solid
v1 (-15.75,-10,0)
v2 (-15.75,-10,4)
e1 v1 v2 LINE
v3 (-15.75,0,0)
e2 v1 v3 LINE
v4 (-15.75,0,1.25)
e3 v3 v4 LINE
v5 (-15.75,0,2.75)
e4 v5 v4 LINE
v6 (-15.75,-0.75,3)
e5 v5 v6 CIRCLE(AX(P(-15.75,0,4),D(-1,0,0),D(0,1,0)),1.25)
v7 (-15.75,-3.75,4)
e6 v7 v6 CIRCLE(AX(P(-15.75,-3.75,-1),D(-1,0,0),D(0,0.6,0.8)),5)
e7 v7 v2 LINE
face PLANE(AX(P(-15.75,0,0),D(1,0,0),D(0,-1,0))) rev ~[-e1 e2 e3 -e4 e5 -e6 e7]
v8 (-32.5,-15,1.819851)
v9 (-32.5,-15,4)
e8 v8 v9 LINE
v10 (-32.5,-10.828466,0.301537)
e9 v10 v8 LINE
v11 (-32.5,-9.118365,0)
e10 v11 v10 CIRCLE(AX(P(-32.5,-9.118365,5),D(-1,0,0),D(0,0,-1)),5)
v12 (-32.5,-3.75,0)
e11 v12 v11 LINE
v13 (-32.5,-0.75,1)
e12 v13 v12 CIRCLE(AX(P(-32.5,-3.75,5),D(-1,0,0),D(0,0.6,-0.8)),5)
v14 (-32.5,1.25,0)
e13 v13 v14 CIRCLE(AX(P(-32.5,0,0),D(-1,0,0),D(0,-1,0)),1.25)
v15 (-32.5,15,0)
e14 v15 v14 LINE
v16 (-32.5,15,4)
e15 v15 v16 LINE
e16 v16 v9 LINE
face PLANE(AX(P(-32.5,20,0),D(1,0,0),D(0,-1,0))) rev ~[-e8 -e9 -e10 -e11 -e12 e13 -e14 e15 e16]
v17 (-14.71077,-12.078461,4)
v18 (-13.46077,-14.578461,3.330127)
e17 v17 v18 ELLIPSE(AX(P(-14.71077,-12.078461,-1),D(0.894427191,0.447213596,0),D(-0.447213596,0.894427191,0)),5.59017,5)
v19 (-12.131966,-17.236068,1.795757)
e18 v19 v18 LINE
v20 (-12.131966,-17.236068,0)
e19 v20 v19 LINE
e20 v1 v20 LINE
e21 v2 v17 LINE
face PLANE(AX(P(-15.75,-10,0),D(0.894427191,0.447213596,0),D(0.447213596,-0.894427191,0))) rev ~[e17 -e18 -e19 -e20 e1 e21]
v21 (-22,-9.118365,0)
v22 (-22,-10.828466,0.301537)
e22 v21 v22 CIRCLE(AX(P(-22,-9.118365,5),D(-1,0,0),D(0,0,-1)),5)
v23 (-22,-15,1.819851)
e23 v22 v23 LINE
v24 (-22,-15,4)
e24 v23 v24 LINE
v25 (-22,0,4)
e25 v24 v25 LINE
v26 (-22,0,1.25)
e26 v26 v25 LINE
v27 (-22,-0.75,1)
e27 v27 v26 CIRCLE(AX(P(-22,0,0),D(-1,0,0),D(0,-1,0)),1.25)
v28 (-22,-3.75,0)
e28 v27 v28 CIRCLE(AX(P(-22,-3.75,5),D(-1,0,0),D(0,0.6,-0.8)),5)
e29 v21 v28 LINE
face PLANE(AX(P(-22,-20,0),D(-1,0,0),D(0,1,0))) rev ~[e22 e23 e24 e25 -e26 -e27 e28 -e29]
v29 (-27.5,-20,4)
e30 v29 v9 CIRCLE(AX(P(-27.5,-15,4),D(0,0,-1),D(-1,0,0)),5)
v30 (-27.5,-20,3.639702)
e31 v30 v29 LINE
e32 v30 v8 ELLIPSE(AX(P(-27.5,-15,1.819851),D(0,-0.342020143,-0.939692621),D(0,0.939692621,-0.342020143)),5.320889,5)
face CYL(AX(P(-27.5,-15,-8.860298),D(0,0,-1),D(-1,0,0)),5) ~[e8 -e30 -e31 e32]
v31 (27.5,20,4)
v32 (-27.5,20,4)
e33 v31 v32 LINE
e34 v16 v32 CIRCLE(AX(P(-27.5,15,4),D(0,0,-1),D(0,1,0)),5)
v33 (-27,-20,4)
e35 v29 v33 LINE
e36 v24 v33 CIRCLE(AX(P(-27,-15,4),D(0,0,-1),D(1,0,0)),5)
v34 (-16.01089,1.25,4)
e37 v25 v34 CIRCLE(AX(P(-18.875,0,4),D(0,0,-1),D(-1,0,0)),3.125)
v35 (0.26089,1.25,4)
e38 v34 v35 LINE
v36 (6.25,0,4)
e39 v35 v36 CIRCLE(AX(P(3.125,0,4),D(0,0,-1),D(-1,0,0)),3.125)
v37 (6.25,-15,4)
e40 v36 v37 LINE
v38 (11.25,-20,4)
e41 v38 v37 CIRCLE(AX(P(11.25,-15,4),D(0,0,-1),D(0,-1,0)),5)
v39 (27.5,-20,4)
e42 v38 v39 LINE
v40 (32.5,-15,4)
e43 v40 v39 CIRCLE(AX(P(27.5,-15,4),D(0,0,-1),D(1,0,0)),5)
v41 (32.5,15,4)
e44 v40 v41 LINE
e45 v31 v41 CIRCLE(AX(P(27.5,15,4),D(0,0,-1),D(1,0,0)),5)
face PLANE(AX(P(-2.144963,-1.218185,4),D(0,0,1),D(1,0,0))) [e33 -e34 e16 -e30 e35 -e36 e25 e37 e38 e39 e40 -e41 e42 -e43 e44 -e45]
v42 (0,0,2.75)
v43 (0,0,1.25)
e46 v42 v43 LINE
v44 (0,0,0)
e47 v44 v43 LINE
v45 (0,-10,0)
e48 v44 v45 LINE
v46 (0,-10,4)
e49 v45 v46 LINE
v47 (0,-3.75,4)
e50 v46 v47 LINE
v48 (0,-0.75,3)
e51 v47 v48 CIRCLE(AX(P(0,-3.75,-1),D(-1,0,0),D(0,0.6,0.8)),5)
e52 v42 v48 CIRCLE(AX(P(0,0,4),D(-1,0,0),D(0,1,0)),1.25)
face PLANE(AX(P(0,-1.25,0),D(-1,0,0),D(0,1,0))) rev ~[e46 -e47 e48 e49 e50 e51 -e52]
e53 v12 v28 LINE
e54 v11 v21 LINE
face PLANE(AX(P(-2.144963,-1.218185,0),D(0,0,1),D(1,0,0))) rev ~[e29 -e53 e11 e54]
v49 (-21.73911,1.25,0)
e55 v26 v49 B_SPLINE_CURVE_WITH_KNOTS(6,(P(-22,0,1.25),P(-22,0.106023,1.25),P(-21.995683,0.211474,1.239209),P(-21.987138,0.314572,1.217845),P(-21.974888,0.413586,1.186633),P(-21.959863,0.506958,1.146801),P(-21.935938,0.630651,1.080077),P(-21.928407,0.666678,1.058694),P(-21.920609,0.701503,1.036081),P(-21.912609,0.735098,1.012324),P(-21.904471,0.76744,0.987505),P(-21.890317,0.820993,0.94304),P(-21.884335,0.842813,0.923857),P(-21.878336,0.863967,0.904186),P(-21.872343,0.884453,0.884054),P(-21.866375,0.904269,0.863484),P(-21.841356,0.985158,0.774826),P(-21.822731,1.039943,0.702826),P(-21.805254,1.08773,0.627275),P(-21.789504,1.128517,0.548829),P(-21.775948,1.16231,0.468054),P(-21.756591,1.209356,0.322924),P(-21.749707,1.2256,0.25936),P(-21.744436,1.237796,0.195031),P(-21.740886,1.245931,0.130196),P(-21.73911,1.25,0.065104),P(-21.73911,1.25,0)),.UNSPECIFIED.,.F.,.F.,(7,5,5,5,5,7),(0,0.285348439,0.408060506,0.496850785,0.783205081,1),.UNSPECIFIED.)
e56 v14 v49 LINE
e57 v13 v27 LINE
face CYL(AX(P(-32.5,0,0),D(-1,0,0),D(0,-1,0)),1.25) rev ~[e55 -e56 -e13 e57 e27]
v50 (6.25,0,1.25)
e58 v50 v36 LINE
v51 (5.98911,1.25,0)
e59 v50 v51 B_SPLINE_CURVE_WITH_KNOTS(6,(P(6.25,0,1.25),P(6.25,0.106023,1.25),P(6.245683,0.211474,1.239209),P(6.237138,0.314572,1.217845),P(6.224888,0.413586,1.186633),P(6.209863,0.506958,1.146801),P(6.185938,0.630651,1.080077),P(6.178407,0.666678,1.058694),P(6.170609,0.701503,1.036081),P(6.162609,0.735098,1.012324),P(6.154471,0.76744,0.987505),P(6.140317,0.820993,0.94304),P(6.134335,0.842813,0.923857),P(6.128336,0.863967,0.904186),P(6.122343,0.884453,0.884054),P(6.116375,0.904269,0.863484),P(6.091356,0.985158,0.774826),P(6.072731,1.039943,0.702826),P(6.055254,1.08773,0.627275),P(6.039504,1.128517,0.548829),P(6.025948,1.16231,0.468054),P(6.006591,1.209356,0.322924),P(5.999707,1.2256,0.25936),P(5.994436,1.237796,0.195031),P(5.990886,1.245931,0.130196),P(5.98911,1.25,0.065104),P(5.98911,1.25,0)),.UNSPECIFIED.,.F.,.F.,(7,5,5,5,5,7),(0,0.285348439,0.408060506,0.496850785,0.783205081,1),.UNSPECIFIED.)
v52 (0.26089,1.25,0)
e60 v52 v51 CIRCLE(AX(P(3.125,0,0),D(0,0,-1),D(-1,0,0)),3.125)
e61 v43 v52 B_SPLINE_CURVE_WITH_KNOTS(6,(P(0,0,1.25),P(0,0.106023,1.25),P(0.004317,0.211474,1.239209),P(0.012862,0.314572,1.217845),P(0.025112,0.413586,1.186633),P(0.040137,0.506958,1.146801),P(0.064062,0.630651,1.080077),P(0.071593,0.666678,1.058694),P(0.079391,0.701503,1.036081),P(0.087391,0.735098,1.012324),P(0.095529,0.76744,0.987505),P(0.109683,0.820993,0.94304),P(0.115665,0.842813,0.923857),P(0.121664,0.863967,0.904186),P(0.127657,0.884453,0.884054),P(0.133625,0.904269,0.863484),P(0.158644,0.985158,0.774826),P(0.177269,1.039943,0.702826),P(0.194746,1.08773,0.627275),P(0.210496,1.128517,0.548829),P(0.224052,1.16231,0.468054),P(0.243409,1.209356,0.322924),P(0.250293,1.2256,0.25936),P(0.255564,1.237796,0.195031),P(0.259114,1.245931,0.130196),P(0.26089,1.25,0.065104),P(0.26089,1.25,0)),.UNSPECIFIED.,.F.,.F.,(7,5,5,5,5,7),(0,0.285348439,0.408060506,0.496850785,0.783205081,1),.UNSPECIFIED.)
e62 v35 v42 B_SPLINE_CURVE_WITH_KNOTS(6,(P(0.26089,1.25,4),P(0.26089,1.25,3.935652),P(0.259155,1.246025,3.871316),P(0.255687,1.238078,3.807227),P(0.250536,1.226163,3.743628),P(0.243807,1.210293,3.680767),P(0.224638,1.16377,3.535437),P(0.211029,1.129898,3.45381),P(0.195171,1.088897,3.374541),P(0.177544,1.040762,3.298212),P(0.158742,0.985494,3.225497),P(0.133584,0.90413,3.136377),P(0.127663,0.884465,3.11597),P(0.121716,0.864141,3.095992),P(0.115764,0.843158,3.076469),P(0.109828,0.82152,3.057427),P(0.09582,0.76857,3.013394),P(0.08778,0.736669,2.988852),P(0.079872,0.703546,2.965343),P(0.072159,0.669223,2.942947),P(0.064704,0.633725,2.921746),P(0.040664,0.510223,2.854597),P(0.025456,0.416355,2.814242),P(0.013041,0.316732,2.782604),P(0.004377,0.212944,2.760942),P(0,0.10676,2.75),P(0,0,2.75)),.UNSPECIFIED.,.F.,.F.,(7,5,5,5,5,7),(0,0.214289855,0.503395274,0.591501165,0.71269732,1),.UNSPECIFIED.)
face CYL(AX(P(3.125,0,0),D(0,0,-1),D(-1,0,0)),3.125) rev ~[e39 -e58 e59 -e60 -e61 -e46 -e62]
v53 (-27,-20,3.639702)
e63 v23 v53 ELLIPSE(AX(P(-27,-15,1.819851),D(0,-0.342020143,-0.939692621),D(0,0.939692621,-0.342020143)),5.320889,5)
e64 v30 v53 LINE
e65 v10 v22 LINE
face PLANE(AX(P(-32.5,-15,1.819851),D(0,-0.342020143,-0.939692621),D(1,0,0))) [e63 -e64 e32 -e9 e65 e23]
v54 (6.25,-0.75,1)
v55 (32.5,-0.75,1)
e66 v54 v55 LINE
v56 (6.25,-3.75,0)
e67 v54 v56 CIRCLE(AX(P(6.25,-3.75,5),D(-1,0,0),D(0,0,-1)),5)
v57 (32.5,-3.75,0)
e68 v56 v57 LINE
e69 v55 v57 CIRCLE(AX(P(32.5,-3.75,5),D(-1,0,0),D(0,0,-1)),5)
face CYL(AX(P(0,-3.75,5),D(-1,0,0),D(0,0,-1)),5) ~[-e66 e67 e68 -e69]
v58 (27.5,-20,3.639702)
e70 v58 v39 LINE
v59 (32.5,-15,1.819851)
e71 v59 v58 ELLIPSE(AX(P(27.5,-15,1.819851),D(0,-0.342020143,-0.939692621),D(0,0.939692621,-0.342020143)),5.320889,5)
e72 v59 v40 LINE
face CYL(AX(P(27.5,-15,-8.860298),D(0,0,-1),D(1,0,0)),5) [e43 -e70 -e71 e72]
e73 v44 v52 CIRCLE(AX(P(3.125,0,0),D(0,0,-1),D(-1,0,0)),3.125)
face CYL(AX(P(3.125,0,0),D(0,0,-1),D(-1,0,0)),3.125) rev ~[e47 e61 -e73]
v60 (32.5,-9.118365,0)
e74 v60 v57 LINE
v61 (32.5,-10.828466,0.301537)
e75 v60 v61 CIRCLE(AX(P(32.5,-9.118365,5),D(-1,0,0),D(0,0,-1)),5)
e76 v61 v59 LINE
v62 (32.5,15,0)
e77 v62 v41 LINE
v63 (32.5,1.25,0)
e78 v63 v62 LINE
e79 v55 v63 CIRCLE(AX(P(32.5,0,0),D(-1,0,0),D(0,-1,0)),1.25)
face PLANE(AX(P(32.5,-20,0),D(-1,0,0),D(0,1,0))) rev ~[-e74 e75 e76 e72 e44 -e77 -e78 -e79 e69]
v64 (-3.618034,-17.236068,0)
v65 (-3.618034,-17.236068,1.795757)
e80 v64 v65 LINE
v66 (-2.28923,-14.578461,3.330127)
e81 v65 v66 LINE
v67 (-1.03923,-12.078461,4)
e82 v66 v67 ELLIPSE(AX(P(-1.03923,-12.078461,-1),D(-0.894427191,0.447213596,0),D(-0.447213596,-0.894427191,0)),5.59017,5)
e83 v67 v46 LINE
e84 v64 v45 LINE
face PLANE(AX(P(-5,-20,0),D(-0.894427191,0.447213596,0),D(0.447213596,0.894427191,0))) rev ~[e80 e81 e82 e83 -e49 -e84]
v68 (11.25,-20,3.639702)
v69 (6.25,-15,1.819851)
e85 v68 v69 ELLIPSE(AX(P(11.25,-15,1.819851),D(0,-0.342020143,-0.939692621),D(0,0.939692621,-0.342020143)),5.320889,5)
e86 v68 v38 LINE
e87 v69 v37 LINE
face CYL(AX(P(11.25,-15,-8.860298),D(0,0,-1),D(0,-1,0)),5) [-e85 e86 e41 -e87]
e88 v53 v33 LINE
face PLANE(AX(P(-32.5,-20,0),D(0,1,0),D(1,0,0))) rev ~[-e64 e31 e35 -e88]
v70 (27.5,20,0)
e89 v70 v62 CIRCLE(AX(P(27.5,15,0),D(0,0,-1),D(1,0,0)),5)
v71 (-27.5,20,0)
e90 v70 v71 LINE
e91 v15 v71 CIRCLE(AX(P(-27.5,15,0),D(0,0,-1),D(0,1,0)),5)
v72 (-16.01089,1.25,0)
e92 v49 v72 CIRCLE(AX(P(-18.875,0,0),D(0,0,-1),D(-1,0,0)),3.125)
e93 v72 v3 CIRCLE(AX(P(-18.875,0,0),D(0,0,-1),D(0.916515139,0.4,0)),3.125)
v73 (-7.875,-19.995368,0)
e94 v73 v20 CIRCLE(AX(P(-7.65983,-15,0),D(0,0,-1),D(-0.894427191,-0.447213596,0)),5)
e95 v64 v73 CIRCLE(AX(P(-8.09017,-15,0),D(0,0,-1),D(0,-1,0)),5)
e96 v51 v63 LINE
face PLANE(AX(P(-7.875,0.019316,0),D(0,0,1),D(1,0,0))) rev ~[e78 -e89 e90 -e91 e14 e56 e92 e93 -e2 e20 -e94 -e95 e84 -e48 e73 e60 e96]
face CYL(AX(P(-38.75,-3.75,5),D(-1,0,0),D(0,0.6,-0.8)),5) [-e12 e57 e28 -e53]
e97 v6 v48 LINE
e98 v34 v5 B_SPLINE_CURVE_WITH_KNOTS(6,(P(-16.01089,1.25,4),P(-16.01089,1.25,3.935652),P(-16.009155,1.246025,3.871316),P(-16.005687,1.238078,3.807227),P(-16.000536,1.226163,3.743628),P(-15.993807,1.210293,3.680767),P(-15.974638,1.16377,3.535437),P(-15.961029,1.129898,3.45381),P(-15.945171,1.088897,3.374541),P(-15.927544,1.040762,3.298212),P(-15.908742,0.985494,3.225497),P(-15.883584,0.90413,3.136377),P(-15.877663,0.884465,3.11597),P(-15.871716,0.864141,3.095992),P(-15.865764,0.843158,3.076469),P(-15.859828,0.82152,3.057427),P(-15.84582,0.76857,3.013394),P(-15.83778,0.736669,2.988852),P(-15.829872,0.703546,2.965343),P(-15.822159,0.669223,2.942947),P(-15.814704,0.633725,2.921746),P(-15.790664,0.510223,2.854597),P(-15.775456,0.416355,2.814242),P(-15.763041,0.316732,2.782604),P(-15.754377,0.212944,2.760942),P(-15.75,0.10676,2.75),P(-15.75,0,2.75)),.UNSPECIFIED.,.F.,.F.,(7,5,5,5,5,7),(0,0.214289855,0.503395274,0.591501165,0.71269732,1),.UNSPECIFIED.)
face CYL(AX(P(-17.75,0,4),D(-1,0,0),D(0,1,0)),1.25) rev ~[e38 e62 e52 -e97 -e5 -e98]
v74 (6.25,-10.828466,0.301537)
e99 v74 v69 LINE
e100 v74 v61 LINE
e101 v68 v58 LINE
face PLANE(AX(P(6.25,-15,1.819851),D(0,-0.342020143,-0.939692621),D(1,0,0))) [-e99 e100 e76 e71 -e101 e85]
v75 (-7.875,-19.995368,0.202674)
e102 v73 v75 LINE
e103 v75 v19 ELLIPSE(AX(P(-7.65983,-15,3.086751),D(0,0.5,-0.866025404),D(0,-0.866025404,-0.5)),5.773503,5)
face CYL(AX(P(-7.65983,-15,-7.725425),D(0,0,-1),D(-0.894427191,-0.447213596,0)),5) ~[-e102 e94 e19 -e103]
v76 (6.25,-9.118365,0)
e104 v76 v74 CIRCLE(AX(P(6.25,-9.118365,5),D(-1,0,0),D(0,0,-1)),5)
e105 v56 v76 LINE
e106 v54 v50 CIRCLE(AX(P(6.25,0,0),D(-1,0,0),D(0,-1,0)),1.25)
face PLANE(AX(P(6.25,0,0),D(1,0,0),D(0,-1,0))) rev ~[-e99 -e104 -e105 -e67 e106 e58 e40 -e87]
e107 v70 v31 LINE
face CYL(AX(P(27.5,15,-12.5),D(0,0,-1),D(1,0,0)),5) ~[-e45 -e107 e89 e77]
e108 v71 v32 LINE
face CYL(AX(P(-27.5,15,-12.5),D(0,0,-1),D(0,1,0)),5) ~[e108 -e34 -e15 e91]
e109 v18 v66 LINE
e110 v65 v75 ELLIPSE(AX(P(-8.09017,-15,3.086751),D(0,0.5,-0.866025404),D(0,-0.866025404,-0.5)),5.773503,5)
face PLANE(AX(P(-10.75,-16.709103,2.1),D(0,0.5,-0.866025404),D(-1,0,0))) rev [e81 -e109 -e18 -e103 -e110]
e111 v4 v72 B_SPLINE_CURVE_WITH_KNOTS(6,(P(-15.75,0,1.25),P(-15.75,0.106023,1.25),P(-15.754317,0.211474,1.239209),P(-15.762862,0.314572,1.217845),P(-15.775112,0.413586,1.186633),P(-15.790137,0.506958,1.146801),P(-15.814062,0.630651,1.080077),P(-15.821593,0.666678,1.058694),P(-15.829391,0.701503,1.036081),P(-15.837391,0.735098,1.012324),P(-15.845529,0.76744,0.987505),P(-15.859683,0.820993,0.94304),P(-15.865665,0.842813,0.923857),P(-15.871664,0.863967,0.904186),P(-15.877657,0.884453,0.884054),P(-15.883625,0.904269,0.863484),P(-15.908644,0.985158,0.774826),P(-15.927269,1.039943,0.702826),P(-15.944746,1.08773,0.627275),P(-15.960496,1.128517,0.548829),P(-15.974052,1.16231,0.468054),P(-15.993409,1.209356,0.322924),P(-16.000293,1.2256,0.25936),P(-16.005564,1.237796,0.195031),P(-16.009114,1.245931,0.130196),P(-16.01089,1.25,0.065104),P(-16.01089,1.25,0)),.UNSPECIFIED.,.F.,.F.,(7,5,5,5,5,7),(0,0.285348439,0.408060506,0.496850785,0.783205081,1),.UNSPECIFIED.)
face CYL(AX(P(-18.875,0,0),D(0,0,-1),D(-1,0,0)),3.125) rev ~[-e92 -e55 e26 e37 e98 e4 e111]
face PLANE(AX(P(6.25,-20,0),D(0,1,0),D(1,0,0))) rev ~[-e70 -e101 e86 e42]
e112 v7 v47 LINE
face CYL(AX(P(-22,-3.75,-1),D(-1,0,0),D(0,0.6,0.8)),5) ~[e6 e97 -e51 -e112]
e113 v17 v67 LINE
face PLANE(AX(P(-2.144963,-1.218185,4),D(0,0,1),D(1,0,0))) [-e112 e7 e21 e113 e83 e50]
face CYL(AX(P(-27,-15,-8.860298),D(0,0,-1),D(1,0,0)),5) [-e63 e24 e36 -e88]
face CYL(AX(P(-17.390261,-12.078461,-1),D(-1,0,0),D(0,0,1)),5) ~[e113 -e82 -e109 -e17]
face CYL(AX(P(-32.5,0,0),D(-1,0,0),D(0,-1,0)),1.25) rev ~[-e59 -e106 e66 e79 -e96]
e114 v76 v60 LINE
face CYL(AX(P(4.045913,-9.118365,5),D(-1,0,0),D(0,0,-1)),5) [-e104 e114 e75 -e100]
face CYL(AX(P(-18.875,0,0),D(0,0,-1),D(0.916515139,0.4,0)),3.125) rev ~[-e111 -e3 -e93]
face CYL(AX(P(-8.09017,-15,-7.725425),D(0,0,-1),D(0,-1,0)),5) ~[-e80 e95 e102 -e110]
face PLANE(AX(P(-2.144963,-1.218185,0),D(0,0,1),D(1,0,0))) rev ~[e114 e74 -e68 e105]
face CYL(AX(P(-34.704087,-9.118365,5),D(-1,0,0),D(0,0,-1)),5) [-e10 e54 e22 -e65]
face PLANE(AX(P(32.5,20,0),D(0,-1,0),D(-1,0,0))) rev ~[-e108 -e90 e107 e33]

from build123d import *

# Parameters (mm, degrees)
F1_DEPTH      = 4
F3_DEPTH      = 65.001
F5_DEPTH      = 2
F8_DEPTH      = 20
F9_SIZE2      = 6.5817930688
F9_SIZE       = 3.8
F10_SIZE2     = 3.6397023427
F10_SIZE      = 10
F10_2_SIZE2   = 3.6397023427
F10_2_SIZE    = 10
F11_T1_DEPTH  = 19.0305228795
F11_T3_DEPTH  = 14.9081745177
F11_T5_DEPTH  = 30.6581745177
F11_T7_DEPTH  = 38.75
F11_T9_DEPTH  = 23
F11_T11_DEPTH = 28.25
F11_T13_DEPTH = 29
F11_T15_DEPTH = 25.3602976573
F11_T17_DEPTH = 15.6508497187


# Not quite as in the source:
# - a fillet or chamfer that OpenCascade refuses, or shapes differently, is made with other operations: its cross-section is extruded or revolved along the edge and cut away or added


with BuildPart() as f1:
    # F0 (on Top) → F1 (new body)
    with BuildSketch(Plane.XY):
        with BuildLine():
            Line((32.5, -20), (32.5, 20))
            Line((32.5, 20), (-32.5, 20))
            Line((-32.5, 20), (-32.5, -20))
            Line((-32.5, -20), (-22, -20))
            Line((-22, -20), (-22, 0))
            ThreePointArc((-22, 0), (-18.875, 3.125), (-15.75, 0))
            Line((-15.75, 0), (-15.75, -10))
            Line((-15.75, -10), (-10.75, -20))
            Line((-10.75, -20), (-5, -20))
            Line((-5, -20), (0, -10))
            Line((0, -10), (0, 0))
            ThreePointArc((0, 0), (3.125, 3.125), (6.25, 0))
            Line((6.25, 0), (6.25, -20))
            Line((6.25, -20), (32.5, -20))
        make_face()
    extrude(amount=F1_DEPTH)

    # F2 (on face) → F3 (cut, through all)
    with BuildSketch(Plane(origin=(-32.5, 0, 0), x_dir=(0, -1, 0), z_dir=(-1, 0, 0))):
        with BuildLine():
            Line((-1.25, 0), (1.25, 0))
            ThreePointArc((1.25, 0), (0, 1.25), (-1.25, 0))
        make_face()
    extrude(amount=-F3_DEPTH, mode=Mode.SUBTRACT)

    # F4 (on face) → F5 (join)
    with BuildSketch(Plane.XY):
        with BuildLine():
            ThreePointArc((0, 0), (0.0659177721, 0.6384676365), (0.2608901907, 1.25))
            Line((0.2608901907, 1.25), (-16.0108901907, 1.25))
            ThreePointArc((-16.0108901907, 1.25), (-15.8159177721, 0.6384676365), (-15.75, 0))
            Line((-15.75, 0), (-15.75, -1.25))
            Line((-15.75, -1.25), (0, -1.25))
            Line((0, -1.25), (0, 0))
        make_face()
    extrude(amount=F5_DEPTH)

    # F7 (on offset) → F8 (cut)
    with BuildSketch(Plane(origin=(-17.75, 0, 0), x_dir=(0, -1, 0), z_dir=(-1, 0, 0))):
        with BuildLine():
            Line((1.25, 4), (0, 4))
            Line((0, 4), (-1.25, 4))
            ThreePointArc((-1.25, 4), (0, 2.75), (1.25, 4))
        make_face()
    extrude(amount=-F8_DEPTH, mode=Mode.SUBTRACT)

    # F9
    f9_edges = [f1.edges().sort_by_distance(p)[0] for p in [
        (-7.875, -20, 4),
    ]]
    f9_side = f1.faces().sort_by_distance((-7.875, -20, 2))[0]
    chamfer(f9_edges, length=F9_SIZE, length2=F9_SIZE2, reference=f9_side)

    # F10
    f10_edges = [f1.edges().sort_by_distance(p)[0] for p in [
        (-27.25, -20, 0),
    ]]
    f10_side = f1.faces().sort_by_distance((-27.25, -10.625, 0))[0]
    chamfer(f10_edges, length=F10_SIZE, length2=F10_SIZE2, reference=f10_side)

    # F10#2
    f10_2_edges = [f1.edges().sort_by_distance(p)[0] for p in [
        (19.375, -20, 0),
    ]]
    f10_2_side = f1.faces().sort_by_distance((19.375, -10.625, 0))[0]
    chamfer(f10_2_edges, length=F10_2_SIZE, length2=F10_2_SIZE2, reference=f10_2_side)

    # F11: fillet of radius 5 on 14 edges, made by hand

    # F11_s2 → F11_t1 (cut)
    with BuildSketch(Plane.YZ.offset(-17.3902614398)):
        with BuildLine():
            ThreePointArc((-12.0784609691, 4), (-13.3725561946, 3.8296291314), (-14.5784609691, 3.3301270189))
            Line((-14.5784609691, 3.3301270189), (-13.4182069312, 4))
            Line((-13.4182069312, 4), (-12.0784609691, 4))
        make_face()
    extrude(amount=F11_T1_DEPTH, mode=Mode.SUBTRACT)

    # F11_s4 → F11_t3 (cut)
    with BuildSketch(Plane.YZ.offset(-34.7040872589)):
        with BuildLine():
            ThreePointArc((-9.1183650965, 0), (-9.9866059848, 0.0759612349), (-10.8284658131, 0.3015368961))
            Line((-10.8284658131, 0.3015368961), (-10, 0))
            Line((-10, 0), (-9.1183650965, 0))
        make_face()
    extrude(amount=F11_T3_DEPTH, mode=Mode.SUBTRACT)

    # F11_s6 → F11_t5 (cut)
    with BuildSketch(Plane.YZ.offset(4.0459127411)):
        with BuildLine():
            ThreePointArc((-9.1183650965, 0), (-9.9866059848, 0.0759612349), (-10.8284658131, 0.3015368961))
            Line((-10.8284658131, 0.3015368961), (-10, 0))
            Line((-10, 0), (-9.1183650965, 0))
        make_face()
    extrude(amount=F11_T5_DEPTH, mode=Mode.SUBTRACT)

    # F11_s8 → F11_t7 (cut)
    with BuildSketch(Plane.YZ):
        with BuildLine():
            ThreePointArc((-3.75, 0), (-2.1688611699, 0.2565835097), (-0.75, 1))
            ThreePointArc((-0.75, 1), (-1.1180339887, 0.5590169944), (-1.25, 0))
            Line((-1.25, 0), (-3.75, 0))
        make_face()
    extrude(amount=F11_T7_DEPTH, mode=Mode.SUBTRACT)

    # F11_s10 → F11_t9 (cut)
    with BuildSketch(Plane.YZ.offset(-38.75)):
        with BuildLine():
            ThreePointArc((-0.75, 1), (-2.1688611699, 0.2565835097), (-3.75, 0))
            Line((-3.75, 0), (-1.25, 0))
            ThreePointArc((-1.25, 0), (-1.1180339887, 0.5590169944), (-0.75, 1))
        make_face()
    extrude(amount=F11_T9_DEPTH, mode=Mode.SUBTRACT)

    # F11_s12 → F11_t11 (cut)
    with BuildSketch(Plane.YZ.offset(-22)):
        with BuildLine():
            ThreePointArc((-0.75, 3), (-2.1688611699, 3.7434164903), (-3.75, 4))
            Line((-3.75, 4), (-1.25, 4))
            ThreePointArc((-1.25, 4), (-1.1180339887, 3.4409830056), (-0.75, 3))
        make_face()
    extrude(amount=F11_T11_DEPTH, mode=Mode.SUBTRACT)

    # F11_s14 → F11_t13 (cut)
    with BuildSketch(Plane.XY.offset(-12.5)):
        with BuildLine():
            ThreePointArc((-27.5, 20), (-31.0355339059, 18.5355339059), (-32.5, 15))
            Line((-32.5, 15), (-32.5, 20))
            Line((-32.5, 20), (-27.5, 20))
        make_face()
        with BuildLine():
            ThreePointArc((32.5, 15), (31.0355339059, 18.5355339059), (27.5, 20))
            Line((27.5, 20), (32.5, 20))
            Line((32.5, 20), (32.5, 15))
        make_face()
    extrude(amount=F11_T13_DEPTH, mode=Mode.SUBTRACT)

    # F11_s16 → F11_t15 (cut)
    with BuildSketch(Plane.XY.offset(-8.8602976573)):
        with BuildLine():
            ThreePointArc((-32.5, -15), (-31.0355339059, -18.5355339059), (-27.5, -20))
            Line((-27.5, -20), (-32.5, -20))
            Line((-32.5, -20), (-32.5, -15))
        make_face()
        with BuildLine():
            ThreePointArc((-22, -15), (-23.4644660941, -18.5355339059), (-27, -20))
            Line((-27, -20), (-22, -20))
            Line((-22, -20), (-22, -15))
        make_face()
        with BuildLine():
            ThreePointArc((11.25, -20), (7.7144660941, -18.5355339059), (6.25, -15))
            Line((6.25, -15), (6.25, -20))
            Line((6.25, -20), (11.25, -20))
        make_face()
        with BuildLine():
            ThreePointArc((32.5, -15), (31.0355339059, -18.5355339059), (27.5, -20))
            Line((27.5, -20), (32.5, -20))
            Line((32.5, -20), (32.5, -15))
        make_face()
    extrude(amount=F11_T15_DEPTH, mode=Mode.SUBTRACT)

    # F11_s18 → F11_t17 (cut)
    with BuildSketch(Plane.XY.offset(-7.7254248594)):
        with BuildLine():
            ThreePointArc((-8.0901699437, -20), (-5.4615143832, -19.2532540418), (-3.6180339887, -17.2360679775))
            Line((-3.6180339887, -17.2360679775), (-5, -20))
            Line((-5, -20), (-8.0901699437, -20))
        make_face()
        with BuildLine():
            ThreePointArc((-12.1319660113, -17.2360679775), (-10.2884856168, -19.2532540418), (-7.6598300563, -20))
            Line((-7.6598300563, -20), (-10.75, -20))
            Line((-10.75, -20), (-12.1319660113, -17.2360679775))
        make_face()
    extrude(amount=F11_T17_DEPTH, mode=Mode.SUBTRACT)


solid = f1.part
